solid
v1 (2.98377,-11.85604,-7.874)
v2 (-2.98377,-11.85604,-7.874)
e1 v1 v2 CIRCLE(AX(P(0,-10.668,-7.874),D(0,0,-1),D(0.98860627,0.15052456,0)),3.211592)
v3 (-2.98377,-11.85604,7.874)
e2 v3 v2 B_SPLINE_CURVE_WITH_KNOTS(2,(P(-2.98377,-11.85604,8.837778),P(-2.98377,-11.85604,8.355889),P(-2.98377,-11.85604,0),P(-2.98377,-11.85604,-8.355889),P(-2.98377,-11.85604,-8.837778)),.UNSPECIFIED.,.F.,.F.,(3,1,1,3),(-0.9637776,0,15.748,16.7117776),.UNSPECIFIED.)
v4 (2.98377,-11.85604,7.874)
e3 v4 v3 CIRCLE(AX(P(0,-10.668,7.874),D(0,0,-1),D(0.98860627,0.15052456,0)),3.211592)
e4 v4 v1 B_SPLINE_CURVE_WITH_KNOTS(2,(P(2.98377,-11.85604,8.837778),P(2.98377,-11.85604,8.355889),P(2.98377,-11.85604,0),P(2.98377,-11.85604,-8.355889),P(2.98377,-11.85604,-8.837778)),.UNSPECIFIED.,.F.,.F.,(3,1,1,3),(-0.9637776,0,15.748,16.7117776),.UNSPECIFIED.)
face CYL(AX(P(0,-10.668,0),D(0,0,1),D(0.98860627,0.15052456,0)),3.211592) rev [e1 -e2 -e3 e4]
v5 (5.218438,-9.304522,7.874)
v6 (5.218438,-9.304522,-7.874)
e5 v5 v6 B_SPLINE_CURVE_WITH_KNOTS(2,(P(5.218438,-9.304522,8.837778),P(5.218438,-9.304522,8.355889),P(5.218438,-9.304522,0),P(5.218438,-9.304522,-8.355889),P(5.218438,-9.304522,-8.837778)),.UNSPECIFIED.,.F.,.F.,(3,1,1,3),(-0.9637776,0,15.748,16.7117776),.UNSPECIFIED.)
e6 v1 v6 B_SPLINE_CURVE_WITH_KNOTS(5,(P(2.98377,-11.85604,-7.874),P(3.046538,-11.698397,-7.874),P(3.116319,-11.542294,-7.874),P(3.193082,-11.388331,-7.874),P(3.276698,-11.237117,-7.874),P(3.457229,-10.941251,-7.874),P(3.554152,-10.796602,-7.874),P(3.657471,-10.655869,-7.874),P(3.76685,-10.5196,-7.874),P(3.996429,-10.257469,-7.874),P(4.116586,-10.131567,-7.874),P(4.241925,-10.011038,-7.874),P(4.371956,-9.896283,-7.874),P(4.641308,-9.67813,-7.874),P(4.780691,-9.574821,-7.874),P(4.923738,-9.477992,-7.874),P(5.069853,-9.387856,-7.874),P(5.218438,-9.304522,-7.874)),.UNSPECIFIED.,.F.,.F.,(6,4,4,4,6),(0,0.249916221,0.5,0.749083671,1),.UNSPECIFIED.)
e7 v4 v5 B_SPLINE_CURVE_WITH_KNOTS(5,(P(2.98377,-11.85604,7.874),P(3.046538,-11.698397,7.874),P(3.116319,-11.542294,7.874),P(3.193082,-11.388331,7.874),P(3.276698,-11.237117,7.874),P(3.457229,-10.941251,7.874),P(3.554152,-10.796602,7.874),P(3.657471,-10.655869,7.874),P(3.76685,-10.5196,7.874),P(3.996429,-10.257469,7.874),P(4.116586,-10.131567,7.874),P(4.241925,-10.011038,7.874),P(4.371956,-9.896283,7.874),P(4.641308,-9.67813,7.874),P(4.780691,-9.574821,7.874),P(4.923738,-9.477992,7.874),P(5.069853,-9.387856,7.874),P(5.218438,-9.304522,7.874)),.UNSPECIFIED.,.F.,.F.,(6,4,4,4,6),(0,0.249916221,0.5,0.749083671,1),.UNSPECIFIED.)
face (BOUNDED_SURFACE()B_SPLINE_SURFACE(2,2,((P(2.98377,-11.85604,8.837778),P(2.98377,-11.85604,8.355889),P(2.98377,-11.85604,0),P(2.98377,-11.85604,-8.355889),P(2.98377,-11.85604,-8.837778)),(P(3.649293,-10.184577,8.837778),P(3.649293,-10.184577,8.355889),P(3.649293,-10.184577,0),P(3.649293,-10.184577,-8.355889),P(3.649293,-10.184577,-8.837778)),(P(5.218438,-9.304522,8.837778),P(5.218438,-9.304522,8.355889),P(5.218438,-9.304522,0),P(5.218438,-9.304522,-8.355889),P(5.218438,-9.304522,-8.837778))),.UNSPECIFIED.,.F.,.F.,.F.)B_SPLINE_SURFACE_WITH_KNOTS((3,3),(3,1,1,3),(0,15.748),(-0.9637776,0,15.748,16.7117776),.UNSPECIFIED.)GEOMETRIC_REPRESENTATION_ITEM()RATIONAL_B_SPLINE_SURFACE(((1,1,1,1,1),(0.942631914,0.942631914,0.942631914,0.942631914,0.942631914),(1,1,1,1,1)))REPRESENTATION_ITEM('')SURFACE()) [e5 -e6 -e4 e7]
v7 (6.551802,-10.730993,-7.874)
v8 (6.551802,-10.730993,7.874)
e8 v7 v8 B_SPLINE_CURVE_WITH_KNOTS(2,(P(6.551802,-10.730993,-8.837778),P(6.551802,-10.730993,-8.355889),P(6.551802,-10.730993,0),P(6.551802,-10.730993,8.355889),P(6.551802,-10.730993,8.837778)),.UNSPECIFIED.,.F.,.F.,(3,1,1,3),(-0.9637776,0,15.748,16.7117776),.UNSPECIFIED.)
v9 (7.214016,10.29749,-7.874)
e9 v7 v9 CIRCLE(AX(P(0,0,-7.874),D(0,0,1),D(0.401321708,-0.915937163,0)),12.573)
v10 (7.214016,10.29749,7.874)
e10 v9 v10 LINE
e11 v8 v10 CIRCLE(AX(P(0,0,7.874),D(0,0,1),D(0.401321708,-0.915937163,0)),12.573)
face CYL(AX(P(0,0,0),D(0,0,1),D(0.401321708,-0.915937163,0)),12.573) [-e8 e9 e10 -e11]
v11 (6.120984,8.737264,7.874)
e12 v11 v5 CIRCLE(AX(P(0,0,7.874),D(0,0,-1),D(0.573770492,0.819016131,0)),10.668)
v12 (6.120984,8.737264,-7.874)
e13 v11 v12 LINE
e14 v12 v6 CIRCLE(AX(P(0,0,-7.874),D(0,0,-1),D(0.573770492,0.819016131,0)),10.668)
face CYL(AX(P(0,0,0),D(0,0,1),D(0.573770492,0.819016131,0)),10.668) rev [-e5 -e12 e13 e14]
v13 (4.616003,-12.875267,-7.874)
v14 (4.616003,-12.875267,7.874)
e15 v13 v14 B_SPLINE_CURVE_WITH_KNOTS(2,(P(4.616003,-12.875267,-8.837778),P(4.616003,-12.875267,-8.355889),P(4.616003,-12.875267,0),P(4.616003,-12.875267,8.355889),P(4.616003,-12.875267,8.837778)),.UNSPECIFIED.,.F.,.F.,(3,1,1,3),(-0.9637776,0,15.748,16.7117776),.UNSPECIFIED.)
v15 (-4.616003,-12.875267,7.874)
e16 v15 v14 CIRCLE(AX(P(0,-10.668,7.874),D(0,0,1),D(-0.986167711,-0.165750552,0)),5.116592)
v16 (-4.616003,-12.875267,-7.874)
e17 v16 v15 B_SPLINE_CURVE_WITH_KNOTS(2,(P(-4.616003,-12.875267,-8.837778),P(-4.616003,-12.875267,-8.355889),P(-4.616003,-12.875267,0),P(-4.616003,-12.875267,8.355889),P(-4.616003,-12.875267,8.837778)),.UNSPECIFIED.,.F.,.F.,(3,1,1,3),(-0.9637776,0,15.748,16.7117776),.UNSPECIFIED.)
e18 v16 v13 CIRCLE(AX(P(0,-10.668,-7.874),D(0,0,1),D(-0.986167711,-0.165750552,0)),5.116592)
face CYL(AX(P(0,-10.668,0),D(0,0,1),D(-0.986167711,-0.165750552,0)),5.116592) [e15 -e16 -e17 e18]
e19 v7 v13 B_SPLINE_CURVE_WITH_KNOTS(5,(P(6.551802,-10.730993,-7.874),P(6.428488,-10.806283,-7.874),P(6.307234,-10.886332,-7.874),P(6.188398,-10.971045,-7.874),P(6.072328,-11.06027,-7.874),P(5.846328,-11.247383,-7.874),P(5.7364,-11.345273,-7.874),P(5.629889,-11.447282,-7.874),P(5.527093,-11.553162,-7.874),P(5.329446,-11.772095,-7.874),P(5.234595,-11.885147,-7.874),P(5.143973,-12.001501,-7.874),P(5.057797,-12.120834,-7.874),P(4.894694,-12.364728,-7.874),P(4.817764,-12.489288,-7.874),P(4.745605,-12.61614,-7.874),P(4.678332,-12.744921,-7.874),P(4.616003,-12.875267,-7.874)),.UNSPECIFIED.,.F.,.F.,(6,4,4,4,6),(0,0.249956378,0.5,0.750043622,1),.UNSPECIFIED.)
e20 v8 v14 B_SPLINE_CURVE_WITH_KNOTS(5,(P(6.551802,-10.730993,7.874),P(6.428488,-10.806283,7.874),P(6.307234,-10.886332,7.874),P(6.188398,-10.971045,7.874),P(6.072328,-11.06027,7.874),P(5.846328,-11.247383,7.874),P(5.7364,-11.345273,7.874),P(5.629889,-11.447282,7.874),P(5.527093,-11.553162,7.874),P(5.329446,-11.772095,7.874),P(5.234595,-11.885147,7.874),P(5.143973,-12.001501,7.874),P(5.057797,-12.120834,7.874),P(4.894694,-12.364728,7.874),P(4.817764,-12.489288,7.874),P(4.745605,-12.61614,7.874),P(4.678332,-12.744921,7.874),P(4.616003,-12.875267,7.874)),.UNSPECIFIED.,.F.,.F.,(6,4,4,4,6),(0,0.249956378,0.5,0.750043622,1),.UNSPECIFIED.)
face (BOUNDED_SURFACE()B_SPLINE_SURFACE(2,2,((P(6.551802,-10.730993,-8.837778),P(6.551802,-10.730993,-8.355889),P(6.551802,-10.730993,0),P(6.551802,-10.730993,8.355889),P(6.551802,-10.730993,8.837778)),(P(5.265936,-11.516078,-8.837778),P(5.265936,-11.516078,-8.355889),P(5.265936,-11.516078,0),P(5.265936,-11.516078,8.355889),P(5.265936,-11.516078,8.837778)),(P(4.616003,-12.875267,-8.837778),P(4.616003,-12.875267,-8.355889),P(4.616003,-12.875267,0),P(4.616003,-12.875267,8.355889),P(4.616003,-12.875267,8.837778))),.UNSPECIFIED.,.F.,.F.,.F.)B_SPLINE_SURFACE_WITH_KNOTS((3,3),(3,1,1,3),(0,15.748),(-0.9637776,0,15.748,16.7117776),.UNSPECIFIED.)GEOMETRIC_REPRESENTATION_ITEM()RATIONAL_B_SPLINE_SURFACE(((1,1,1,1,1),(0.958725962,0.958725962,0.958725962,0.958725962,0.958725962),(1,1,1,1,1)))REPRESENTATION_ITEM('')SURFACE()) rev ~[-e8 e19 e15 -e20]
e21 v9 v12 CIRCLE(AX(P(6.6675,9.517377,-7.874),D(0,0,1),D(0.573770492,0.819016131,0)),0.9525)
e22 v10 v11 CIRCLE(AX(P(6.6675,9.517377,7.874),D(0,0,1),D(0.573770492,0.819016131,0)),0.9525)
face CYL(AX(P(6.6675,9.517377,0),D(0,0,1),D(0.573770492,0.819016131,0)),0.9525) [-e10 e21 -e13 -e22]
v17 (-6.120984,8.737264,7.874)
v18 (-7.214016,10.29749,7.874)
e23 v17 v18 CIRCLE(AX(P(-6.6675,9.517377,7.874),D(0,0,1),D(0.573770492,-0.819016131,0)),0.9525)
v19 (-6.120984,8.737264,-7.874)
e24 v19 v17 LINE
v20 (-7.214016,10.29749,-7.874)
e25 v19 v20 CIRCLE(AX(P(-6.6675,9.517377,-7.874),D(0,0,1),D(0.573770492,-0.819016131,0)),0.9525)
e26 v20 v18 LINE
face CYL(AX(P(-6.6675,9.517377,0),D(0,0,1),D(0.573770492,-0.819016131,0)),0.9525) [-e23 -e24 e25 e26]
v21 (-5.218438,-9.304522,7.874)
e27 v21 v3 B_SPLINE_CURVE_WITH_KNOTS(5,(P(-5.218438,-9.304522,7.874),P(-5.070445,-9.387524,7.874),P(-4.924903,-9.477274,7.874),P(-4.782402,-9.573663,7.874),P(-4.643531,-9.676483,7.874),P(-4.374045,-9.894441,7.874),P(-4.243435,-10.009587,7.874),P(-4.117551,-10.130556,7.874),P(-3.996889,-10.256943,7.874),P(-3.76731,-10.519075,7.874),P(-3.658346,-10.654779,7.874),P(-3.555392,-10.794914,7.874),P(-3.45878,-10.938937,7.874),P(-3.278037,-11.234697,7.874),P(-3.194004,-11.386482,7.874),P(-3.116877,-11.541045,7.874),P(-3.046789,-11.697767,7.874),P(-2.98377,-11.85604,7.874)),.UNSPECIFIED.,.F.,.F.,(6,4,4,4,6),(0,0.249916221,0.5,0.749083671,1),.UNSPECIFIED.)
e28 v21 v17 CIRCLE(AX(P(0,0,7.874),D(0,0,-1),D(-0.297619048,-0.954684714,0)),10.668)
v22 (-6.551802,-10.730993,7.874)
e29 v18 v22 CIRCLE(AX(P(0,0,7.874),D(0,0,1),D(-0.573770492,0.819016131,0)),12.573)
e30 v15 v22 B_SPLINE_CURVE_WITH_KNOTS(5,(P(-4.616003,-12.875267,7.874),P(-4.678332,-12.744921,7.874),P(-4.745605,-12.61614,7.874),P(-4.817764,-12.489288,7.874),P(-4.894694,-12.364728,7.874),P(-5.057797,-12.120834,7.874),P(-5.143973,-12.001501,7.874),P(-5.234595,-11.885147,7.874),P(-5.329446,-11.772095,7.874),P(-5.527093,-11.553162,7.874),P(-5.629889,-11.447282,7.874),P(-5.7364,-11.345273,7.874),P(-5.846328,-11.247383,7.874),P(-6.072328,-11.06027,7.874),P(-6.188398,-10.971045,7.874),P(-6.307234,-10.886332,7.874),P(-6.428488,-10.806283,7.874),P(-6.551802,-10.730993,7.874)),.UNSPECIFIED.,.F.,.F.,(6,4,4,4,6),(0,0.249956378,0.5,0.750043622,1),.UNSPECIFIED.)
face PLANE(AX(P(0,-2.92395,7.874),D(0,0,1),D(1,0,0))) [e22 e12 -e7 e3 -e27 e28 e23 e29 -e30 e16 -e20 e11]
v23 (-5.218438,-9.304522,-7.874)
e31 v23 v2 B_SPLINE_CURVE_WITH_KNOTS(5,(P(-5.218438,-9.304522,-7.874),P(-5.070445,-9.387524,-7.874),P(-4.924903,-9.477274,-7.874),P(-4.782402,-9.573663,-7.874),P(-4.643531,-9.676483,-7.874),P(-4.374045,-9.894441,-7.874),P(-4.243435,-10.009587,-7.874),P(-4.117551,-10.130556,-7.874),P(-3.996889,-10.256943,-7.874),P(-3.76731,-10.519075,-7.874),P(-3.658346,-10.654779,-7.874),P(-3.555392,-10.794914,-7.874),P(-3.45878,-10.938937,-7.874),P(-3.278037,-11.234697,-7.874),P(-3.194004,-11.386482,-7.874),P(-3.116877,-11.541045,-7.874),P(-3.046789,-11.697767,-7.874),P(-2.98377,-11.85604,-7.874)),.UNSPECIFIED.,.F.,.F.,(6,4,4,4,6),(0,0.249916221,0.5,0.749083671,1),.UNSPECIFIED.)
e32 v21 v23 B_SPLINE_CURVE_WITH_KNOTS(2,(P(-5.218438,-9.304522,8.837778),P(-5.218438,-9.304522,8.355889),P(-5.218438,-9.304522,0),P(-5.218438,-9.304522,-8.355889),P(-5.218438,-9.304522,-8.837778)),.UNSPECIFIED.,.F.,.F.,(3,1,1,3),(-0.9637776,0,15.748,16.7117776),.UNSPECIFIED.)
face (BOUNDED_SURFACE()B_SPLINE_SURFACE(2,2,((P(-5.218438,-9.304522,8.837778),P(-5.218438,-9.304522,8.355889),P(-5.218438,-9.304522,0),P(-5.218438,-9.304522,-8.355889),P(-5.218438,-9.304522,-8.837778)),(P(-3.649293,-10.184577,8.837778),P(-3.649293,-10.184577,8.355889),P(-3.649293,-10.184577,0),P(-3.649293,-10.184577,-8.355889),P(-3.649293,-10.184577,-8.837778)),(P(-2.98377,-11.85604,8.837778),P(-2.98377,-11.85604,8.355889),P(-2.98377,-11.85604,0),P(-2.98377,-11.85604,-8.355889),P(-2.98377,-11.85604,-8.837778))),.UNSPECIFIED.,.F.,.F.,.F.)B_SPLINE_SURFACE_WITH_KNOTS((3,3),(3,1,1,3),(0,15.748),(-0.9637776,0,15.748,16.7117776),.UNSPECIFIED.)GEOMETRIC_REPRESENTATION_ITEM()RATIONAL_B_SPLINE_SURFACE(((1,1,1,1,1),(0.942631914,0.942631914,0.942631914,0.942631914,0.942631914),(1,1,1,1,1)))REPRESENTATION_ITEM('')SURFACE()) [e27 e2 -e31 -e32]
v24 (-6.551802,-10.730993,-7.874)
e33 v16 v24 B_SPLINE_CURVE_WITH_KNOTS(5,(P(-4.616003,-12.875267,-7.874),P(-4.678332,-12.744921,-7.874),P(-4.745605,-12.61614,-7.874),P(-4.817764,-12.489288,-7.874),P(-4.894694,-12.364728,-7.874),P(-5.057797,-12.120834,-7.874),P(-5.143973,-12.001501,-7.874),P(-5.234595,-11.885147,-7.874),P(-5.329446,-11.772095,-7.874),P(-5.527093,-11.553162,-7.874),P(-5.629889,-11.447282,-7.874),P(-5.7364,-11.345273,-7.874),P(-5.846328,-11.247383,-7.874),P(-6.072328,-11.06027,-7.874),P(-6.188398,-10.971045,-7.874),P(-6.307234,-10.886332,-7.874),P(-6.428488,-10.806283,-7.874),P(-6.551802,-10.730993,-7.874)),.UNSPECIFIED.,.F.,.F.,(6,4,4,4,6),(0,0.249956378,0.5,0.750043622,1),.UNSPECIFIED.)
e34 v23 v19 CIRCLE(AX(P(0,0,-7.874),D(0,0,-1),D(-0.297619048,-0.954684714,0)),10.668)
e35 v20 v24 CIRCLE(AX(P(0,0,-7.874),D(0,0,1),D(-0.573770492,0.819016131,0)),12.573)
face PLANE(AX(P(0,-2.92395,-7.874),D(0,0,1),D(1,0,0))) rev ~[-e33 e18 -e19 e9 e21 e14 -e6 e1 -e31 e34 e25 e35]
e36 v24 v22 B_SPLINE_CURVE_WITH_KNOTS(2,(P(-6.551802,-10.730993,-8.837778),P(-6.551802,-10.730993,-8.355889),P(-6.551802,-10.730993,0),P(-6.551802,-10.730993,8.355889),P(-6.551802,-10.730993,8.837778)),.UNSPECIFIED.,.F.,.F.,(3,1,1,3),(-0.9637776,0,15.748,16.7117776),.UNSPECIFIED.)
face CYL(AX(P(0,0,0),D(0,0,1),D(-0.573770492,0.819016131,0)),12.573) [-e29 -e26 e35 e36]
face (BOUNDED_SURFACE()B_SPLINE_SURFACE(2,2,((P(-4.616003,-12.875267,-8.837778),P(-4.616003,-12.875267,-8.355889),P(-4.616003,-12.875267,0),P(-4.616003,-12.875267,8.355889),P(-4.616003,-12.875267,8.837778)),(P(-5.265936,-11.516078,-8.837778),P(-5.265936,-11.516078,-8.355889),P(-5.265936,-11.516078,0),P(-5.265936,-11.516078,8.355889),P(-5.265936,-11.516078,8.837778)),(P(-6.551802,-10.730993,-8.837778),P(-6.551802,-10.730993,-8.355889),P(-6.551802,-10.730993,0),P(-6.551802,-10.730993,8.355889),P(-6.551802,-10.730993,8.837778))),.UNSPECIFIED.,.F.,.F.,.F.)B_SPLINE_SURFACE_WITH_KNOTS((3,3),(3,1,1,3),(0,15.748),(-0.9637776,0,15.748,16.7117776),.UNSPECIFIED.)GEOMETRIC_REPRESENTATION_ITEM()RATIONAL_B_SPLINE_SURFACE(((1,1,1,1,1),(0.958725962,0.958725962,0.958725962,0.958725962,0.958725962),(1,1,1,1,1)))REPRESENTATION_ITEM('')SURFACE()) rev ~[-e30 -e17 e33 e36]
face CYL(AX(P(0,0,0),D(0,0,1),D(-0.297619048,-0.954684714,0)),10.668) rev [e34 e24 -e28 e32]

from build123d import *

# Parameters (mm, degrees)
F1_DEPTH = 7.874
F2_R     = 5.08


# Not quite as in the source:
# - a feature names something its author has since deleted; it is built from what else it names


with BuildPart() as f1:
    # F0 (on Top) → F1 (new body, symmetric)
    with BuildSketch(Plane.XY):
        with BuildLine():
            ThreePointArc((-3.175, -10.1845765253), (-10.541007581, -1.6411530025), (-6.1209836066, 8.7372640848))
            ThreePointArc((-6.1209836066, 8.7372640848), (-5.8873871353, 10.063893343), (-7.2140163934, 10.2974898143))
            ThreePointArc((-7.2140163934, 10.2974898143), (-12.5113475889, -1.2435877575), (-5.0458178338, -11.5160779516))
            ThreePointArc((-5.0458178338, -11.5160779516), (0, -15.7845920127), (5.0458178338, -11.5160779516))
            ThreePointArc((5.0458178338, -11.5160779516), (12.5113475889, -1.2435877575), (7.2140163934, 10.2974898143))
            ThreePointArc((7.2140163934, 10.2974898143), (5.8873871353, 10.063893343), (6.1209836066, 8.7372640848))
            ThreePointArc((6.1209836066, 8.7372640848), (10.541007581, -1.6411530025), (3.175, -10.1845765253))
            ThreePointArc((3.175, -10.1845765253), (0, -13.8795920127), (-3.175, -10.1845765253))
        make_face()
    extrude(amount=F1_DEPTH, both=True)

    # F2
    f2_edges = [f1.edges().sort_by_distance(p)[0] for p in [
        (-5.045818, -11.516078, 0),
        (-3.175, -10.184577, 0),
        (3.175, -10.184577, 0),
        (5.045818, -11.516078, 0),
    ]]
    fillet(f2_edges, radius=F2_R)


solid = f1.part
